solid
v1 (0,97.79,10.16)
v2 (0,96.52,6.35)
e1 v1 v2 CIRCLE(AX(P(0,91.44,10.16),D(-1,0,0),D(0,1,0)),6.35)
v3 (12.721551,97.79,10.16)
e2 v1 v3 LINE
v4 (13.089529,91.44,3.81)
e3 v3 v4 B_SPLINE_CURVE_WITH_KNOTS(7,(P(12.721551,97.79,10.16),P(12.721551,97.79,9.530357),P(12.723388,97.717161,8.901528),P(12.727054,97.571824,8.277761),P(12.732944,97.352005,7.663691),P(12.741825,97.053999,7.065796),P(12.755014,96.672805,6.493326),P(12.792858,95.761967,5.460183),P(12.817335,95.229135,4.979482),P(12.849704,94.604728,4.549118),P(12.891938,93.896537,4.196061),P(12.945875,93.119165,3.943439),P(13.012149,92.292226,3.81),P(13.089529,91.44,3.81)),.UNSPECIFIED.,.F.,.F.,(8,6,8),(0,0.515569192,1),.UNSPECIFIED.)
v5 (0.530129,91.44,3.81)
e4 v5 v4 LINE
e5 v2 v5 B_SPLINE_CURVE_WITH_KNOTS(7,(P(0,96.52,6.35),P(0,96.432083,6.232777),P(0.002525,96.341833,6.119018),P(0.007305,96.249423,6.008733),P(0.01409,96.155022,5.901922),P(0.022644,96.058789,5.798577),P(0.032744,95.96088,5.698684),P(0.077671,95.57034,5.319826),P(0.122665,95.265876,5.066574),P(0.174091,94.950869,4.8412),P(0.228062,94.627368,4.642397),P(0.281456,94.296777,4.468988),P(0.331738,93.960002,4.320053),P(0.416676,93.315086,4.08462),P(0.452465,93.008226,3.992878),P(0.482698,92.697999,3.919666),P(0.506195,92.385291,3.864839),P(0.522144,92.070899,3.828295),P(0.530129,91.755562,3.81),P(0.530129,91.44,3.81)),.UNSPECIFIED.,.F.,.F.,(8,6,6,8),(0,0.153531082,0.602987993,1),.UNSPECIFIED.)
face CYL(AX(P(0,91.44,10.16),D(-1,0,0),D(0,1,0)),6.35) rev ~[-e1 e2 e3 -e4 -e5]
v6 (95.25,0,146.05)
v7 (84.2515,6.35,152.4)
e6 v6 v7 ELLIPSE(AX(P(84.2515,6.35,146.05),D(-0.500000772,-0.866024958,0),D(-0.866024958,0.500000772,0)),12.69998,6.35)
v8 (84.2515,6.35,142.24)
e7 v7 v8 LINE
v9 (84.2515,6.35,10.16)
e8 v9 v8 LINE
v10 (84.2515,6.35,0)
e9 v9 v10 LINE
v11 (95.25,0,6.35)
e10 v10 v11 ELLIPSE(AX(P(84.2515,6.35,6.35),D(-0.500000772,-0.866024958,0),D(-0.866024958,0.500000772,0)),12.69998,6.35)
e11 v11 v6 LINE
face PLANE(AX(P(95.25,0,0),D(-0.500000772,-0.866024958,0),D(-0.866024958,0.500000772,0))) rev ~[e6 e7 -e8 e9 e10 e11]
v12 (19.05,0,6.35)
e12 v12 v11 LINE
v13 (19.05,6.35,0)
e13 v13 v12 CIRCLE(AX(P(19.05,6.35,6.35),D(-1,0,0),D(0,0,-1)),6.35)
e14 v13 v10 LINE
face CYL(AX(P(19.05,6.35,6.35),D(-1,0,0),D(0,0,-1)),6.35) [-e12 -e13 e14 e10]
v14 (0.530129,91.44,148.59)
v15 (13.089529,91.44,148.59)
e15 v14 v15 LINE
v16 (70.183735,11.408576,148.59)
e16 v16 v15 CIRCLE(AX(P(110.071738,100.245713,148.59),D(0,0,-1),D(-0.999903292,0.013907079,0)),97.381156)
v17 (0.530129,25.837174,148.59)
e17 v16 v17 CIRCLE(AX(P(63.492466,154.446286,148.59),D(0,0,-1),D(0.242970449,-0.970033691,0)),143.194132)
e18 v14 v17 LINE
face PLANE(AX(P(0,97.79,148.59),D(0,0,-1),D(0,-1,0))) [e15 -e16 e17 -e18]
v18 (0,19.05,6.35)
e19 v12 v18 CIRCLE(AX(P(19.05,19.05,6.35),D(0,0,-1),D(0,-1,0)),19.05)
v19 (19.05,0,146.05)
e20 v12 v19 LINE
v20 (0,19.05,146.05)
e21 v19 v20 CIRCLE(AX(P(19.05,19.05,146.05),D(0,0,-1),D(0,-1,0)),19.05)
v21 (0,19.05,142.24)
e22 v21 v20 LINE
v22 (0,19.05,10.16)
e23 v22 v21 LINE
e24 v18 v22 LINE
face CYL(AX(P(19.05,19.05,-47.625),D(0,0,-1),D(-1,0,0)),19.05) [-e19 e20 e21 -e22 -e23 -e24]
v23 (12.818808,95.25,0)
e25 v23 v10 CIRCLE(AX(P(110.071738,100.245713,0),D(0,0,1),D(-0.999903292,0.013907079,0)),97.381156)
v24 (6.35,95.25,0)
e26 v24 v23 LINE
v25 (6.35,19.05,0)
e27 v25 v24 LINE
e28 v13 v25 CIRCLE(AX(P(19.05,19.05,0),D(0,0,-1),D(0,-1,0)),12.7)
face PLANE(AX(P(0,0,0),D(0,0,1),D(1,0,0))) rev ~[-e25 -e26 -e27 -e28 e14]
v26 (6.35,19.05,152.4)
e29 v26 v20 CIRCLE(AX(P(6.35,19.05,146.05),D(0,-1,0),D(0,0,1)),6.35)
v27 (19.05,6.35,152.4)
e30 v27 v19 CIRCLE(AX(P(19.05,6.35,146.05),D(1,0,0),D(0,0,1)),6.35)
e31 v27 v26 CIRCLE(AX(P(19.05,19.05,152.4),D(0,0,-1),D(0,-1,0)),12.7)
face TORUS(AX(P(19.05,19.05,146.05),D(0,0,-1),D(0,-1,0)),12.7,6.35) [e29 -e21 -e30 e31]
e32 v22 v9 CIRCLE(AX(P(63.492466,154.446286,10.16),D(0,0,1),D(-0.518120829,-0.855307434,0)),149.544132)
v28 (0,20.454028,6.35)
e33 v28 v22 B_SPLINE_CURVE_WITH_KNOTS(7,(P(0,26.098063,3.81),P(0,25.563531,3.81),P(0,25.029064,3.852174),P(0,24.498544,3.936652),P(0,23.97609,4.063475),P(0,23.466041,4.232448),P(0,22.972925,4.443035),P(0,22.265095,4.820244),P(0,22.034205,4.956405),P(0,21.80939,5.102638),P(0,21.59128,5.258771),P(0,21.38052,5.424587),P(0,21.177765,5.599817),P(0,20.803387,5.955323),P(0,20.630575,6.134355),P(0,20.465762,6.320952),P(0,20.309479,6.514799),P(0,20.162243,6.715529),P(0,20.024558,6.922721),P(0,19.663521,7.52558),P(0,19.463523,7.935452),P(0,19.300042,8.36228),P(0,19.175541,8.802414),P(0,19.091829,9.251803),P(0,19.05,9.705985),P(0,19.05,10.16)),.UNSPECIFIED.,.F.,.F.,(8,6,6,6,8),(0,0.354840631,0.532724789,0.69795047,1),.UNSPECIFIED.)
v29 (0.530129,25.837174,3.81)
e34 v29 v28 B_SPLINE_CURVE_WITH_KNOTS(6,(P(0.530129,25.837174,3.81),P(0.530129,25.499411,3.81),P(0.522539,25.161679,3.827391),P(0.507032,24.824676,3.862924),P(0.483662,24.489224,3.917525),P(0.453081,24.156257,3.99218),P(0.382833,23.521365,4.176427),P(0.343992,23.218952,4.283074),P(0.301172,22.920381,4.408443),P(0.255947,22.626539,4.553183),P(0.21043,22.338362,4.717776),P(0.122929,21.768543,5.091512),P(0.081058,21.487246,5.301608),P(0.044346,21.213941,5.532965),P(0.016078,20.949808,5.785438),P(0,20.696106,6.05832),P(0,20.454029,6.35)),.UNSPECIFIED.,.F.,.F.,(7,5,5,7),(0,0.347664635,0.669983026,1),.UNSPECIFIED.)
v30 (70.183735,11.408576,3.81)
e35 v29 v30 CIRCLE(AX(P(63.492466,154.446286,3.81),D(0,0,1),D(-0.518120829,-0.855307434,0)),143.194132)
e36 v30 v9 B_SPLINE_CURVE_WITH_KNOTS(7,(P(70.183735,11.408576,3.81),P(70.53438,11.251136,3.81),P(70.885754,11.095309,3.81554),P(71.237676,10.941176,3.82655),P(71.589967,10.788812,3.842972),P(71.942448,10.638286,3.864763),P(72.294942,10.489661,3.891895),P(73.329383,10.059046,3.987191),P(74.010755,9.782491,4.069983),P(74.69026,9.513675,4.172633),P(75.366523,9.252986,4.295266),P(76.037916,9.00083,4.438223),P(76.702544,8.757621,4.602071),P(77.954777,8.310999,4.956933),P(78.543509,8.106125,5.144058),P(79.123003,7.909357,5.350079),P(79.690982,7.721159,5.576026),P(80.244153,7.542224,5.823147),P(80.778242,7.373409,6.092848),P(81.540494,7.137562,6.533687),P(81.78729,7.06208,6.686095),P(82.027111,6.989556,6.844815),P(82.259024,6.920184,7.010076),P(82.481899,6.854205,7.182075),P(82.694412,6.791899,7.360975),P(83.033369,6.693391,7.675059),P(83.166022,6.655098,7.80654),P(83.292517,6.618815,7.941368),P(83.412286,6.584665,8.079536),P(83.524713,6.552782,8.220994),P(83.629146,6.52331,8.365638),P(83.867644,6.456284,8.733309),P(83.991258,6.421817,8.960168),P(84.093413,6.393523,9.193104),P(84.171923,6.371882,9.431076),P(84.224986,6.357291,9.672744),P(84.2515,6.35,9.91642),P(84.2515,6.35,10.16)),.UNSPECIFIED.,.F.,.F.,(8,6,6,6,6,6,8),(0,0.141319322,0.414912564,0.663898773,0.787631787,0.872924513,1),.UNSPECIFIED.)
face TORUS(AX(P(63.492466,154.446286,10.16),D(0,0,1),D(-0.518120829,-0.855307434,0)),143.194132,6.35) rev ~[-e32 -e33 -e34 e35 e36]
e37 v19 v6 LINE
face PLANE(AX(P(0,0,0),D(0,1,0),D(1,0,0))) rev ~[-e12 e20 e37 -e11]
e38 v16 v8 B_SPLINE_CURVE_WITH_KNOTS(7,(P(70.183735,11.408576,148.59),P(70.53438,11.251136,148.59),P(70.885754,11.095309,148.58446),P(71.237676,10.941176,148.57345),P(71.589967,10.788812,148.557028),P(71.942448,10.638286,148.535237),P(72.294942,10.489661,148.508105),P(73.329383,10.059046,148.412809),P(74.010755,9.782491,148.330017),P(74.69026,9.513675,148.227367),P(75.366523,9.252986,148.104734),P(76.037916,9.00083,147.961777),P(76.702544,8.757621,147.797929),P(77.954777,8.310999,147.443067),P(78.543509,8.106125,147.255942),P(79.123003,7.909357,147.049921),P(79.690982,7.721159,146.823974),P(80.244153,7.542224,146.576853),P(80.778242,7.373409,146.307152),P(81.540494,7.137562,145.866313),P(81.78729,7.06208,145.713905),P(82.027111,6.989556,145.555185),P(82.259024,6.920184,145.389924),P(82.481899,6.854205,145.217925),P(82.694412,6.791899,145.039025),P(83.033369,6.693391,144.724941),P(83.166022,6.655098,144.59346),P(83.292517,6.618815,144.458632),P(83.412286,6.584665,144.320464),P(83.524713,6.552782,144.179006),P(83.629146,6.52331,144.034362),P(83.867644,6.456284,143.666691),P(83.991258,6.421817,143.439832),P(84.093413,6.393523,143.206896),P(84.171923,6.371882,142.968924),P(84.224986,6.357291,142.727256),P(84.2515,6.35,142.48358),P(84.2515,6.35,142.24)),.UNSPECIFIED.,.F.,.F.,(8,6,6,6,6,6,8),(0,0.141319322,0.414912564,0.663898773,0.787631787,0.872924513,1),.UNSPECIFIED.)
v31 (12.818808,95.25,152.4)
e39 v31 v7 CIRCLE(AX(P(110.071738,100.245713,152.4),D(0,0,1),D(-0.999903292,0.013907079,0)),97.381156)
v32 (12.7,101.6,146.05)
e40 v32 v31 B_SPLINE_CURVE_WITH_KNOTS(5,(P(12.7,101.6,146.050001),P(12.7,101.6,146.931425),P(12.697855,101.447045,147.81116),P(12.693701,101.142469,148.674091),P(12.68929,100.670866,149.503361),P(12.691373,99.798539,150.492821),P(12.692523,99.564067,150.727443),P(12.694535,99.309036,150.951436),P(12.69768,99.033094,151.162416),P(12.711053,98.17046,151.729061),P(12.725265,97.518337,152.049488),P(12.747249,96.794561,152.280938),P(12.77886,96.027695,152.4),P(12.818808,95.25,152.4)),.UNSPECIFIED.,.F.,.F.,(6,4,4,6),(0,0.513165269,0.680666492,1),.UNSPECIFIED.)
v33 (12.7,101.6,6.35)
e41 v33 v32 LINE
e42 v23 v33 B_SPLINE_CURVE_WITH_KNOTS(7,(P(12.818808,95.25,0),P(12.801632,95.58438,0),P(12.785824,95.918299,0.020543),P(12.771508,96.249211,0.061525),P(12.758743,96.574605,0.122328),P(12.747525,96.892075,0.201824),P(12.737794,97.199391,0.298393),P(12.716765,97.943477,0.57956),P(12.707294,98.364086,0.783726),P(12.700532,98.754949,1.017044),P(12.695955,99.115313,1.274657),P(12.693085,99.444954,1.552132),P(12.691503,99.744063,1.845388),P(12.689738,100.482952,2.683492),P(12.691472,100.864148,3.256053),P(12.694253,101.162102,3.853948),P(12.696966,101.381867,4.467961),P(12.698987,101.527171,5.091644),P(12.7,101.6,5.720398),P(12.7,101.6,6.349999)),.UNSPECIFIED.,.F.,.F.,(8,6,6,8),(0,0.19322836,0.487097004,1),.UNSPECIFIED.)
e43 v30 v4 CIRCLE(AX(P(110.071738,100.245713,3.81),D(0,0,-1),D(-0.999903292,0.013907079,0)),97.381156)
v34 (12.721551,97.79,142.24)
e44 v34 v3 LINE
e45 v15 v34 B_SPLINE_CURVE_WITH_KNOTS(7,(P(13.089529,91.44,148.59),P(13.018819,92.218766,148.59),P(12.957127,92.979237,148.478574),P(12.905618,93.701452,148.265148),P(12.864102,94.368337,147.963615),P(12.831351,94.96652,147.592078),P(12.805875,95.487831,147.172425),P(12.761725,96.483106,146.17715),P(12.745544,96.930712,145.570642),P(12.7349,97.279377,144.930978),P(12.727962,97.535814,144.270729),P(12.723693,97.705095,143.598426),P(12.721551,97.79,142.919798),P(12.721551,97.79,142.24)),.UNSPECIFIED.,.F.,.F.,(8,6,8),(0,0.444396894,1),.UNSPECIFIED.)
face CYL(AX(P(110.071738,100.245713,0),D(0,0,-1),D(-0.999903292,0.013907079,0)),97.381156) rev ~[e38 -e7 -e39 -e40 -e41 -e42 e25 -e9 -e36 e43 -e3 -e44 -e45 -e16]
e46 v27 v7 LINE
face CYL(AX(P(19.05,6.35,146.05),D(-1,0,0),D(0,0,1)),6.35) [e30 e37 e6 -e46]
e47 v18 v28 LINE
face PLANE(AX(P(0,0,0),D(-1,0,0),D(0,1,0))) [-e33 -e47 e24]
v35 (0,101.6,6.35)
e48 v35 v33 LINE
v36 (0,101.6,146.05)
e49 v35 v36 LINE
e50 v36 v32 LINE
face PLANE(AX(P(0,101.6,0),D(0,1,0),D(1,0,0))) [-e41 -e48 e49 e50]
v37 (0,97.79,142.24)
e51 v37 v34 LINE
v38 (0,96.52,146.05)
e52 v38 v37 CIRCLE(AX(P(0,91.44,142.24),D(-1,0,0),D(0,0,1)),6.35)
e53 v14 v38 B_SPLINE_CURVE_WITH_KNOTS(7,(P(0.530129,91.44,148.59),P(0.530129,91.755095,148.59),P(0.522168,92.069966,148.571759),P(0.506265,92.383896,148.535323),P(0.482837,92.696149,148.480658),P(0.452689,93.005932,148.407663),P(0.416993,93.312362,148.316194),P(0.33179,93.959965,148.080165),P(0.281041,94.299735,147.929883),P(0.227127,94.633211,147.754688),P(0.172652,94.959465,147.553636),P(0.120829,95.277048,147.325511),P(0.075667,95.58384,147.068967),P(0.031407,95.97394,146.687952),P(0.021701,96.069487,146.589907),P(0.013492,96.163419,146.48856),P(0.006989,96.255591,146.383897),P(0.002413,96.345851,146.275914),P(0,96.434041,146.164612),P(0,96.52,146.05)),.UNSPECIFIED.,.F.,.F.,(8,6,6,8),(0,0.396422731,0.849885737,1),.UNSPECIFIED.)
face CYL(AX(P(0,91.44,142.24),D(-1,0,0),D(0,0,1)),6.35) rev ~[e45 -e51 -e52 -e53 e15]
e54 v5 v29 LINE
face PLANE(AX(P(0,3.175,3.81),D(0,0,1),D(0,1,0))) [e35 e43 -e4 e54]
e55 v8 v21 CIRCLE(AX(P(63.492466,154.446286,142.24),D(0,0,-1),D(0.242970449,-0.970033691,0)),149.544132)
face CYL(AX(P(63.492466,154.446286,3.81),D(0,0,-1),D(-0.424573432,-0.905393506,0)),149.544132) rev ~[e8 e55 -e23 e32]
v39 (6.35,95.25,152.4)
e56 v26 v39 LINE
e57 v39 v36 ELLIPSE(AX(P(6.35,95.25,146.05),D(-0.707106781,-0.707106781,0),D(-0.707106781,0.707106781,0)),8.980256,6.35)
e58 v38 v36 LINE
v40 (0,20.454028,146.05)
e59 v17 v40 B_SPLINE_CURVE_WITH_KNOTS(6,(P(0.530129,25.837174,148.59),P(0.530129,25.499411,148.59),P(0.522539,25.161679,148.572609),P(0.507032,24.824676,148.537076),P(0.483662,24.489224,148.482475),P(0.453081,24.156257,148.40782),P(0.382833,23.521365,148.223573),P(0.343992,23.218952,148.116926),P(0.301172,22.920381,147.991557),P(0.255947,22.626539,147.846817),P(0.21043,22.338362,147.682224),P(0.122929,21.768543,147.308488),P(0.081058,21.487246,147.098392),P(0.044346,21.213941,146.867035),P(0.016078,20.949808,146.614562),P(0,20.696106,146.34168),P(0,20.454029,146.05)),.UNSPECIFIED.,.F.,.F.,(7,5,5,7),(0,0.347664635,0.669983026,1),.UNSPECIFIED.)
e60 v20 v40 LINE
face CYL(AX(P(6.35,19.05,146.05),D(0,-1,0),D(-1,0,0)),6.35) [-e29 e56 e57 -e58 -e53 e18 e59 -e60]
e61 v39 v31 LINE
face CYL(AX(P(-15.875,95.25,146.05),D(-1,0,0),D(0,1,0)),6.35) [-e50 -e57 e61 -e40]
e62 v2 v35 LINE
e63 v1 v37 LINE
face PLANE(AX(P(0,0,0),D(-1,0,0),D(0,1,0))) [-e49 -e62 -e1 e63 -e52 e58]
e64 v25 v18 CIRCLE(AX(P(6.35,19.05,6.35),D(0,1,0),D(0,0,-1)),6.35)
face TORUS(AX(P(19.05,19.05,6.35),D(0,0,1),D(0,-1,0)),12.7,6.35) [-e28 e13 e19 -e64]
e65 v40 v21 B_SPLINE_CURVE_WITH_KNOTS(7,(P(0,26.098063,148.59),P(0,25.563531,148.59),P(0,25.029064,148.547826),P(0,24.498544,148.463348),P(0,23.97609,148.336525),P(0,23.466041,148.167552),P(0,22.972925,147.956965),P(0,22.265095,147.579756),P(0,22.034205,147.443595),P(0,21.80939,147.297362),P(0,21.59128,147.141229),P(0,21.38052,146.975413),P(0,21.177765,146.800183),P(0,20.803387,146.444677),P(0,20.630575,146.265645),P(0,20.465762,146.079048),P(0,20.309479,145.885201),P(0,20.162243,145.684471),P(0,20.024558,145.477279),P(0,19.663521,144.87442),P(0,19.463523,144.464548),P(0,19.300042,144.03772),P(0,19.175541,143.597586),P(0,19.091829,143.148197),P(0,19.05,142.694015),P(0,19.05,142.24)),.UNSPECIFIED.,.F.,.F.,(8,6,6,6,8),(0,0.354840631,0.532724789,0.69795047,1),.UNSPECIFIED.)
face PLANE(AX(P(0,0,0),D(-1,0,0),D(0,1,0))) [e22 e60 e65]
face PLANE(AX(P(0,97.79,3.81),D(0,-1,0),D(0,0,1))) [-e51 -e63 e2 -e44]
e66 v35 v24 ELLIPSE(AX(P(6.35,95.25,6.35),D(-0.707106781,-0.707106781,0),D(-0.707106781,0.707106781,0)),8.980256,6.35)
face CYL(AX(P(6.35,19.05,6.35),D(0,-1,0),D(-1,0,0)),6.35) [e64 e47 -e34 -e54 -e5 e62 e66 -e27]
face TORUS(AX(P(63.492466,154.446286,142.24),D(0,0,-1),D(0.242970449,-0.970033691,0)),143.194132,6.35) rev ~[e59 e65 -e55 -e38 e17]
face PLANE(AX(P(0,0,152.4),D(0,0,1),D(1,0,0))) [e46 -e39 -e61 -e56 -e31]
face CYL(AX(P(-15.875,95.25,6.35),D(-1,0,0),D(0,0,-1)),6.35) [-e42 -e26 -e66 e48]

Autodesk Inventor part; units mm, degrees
ref_plane "YZ Plane" through (0, 0, 0) normal (1, 0, 0) x (0, 1, 0)
ref_plane "XZ Plane" through (0, 0, 0) normal (0, 1, 0) x (-1, 0, 0)
ref_plane "XY Plane" through (0, 0, 0) normal (0, 0, 1) x (1, 0, 0)
sketch "Sketch1" plane through (0, 0, 0) normal (0, 0, 1) x (1, 0, 0)
  line L0 (0, 0) -> (0, 101.6)
  line L1 (0, 0) -> (95.25, 0)
  line L2 (95.25, 0) -> (84.2515, 6.35)
  line L3 (95.25, 0) -> (107.95, 0) construction
  line L4 (0, 101.6) -> (12.7, 101.6)
  arc A0 (12.7, 101.6) -> (84.2515, 6.35) centre (110.0717, 100.2457) ccw
  dimension "d0" = 101.6
  dimension "d14" = 12.7
  dimension "d15" = 150
  dimension "d16" = 12.7
  dimension "d28" = 95.25
  dimension "d48" = 97.3812
extrude "Extrusion5" add sketch "Sketch1" along normal blind 152.4
sketch "Sketch5" plane through (0, 0, 0) normal (-1, 0, 0) x (0, 0, 1)
  line L0 (3.81, 97.79) -> (148.59, 97.79)
  line L1 (148.59, 97.79) -> (148.59, 3.175)
  line L2 (148.59, 3.175) -> (3.81, 3.175)
  line L3 (3.81, 3.175) -> (3.81, 97.79)
  line L4 (0, 101.6) -> (152.4, 101.6) projected
  line L5 (0, 0) -> (0, 101.6) projected
  line L6 (0, 0) -> (152.4, 0) projected
  line L7 (152.4, 101.6) -> (152.4, 0) projected
  dimension "d37" = 3.81
  dimension "d38" = 3.81
  dimension "d39" = 3.175
  dimension "d40" = 3.81
extrude "Extrusion6" cut sketch "Sketch5" against normal blind 101.6 contours L0 L1 L2 L3
fillet "Fillet3" radius 19.05 1 edges at (0, 0, 76.2)
sketch "Sketch6" plane through (0, 97.79, 3.81) normal (0, 0, 1) x (1, 0, 0)
  arc A0 (0, -78.74) -> (19.05, -97.79) centre (19.05, -78.74) ccw projected
  arc A1 (12.7, 3.81) -> (84.2515, -91.44) centre (77.4018, 0.6973) ccw projected
  arc A2 (0, -78.74) -> (84.2515, -91.44) centre (63.4925, 56.6564) ccw
  arc A3 (0, -78.74) -> (19.05, -97.79) centre (19.05, -78.74) ccw
  line L0 (95.25, -97.79) -> (19.05, -97.79) projected
  line L1 (84.2515, -91.44) -> (95.25, -97.79) projected
  line L2 (19.05, -97.79) -> (95.25, -97.79)
  line L3 (95.25, -97.79) -> (84.2515, -91.44)
  point P0 (0, -97.79)
  dimension "d44" = 149.5443
extrude "Extrusion7" add sketch "Sketch6" along normal up to next
fillet "Fillet4" radius 6.35 12 edges at (41.2021, 6.5727, 148.59) (41.2021, 6.5727, 3.81) (6.3608, 97.79, 148.59) (6.35, 101.6, 152.4) (6.35, 101.6, 0) (6.3608, 97.79, 3.81) (5.5796, 5.5796, 152.4) (0, 60.325, 152.4) (57.15, 0, 152.4) (5.5796, 5.5796, 0) (0, 60.325, 0) (57.15, 0, 0)
sketch "Sketch7" plane through (0, 0, 152.4) normal (0, 0, 1) x (1, 0, 0)
  arc A0 (12.8188, 95.25) -> (84.2515, 6.35) centre (110.0717, 100.2457) ccw projected
  line L0 (12.7, 101.6) -> (0, 101.6) projected
  line L1 (12.7, 101.6) -> (72.04, 101.6)
  arc A1 (13.0895, 91.44) -> (70.1837, 11.4086) centre (110.0717, 100.2457) ccw projected
  arc A2 (12.7, 101.6) -> (24.1017, 54.5046) centre (110.0717, 100.2457) ccw
  line L2 (43.3863, 54.5046) -> (24.1017, 54.5046)
  arc A3 (43.3863, 54.5046) -> (72.04, 101.6) centre (0.6549, 112.7676) ccw
  point P0 (0, 0)
properties part number "Plow"
